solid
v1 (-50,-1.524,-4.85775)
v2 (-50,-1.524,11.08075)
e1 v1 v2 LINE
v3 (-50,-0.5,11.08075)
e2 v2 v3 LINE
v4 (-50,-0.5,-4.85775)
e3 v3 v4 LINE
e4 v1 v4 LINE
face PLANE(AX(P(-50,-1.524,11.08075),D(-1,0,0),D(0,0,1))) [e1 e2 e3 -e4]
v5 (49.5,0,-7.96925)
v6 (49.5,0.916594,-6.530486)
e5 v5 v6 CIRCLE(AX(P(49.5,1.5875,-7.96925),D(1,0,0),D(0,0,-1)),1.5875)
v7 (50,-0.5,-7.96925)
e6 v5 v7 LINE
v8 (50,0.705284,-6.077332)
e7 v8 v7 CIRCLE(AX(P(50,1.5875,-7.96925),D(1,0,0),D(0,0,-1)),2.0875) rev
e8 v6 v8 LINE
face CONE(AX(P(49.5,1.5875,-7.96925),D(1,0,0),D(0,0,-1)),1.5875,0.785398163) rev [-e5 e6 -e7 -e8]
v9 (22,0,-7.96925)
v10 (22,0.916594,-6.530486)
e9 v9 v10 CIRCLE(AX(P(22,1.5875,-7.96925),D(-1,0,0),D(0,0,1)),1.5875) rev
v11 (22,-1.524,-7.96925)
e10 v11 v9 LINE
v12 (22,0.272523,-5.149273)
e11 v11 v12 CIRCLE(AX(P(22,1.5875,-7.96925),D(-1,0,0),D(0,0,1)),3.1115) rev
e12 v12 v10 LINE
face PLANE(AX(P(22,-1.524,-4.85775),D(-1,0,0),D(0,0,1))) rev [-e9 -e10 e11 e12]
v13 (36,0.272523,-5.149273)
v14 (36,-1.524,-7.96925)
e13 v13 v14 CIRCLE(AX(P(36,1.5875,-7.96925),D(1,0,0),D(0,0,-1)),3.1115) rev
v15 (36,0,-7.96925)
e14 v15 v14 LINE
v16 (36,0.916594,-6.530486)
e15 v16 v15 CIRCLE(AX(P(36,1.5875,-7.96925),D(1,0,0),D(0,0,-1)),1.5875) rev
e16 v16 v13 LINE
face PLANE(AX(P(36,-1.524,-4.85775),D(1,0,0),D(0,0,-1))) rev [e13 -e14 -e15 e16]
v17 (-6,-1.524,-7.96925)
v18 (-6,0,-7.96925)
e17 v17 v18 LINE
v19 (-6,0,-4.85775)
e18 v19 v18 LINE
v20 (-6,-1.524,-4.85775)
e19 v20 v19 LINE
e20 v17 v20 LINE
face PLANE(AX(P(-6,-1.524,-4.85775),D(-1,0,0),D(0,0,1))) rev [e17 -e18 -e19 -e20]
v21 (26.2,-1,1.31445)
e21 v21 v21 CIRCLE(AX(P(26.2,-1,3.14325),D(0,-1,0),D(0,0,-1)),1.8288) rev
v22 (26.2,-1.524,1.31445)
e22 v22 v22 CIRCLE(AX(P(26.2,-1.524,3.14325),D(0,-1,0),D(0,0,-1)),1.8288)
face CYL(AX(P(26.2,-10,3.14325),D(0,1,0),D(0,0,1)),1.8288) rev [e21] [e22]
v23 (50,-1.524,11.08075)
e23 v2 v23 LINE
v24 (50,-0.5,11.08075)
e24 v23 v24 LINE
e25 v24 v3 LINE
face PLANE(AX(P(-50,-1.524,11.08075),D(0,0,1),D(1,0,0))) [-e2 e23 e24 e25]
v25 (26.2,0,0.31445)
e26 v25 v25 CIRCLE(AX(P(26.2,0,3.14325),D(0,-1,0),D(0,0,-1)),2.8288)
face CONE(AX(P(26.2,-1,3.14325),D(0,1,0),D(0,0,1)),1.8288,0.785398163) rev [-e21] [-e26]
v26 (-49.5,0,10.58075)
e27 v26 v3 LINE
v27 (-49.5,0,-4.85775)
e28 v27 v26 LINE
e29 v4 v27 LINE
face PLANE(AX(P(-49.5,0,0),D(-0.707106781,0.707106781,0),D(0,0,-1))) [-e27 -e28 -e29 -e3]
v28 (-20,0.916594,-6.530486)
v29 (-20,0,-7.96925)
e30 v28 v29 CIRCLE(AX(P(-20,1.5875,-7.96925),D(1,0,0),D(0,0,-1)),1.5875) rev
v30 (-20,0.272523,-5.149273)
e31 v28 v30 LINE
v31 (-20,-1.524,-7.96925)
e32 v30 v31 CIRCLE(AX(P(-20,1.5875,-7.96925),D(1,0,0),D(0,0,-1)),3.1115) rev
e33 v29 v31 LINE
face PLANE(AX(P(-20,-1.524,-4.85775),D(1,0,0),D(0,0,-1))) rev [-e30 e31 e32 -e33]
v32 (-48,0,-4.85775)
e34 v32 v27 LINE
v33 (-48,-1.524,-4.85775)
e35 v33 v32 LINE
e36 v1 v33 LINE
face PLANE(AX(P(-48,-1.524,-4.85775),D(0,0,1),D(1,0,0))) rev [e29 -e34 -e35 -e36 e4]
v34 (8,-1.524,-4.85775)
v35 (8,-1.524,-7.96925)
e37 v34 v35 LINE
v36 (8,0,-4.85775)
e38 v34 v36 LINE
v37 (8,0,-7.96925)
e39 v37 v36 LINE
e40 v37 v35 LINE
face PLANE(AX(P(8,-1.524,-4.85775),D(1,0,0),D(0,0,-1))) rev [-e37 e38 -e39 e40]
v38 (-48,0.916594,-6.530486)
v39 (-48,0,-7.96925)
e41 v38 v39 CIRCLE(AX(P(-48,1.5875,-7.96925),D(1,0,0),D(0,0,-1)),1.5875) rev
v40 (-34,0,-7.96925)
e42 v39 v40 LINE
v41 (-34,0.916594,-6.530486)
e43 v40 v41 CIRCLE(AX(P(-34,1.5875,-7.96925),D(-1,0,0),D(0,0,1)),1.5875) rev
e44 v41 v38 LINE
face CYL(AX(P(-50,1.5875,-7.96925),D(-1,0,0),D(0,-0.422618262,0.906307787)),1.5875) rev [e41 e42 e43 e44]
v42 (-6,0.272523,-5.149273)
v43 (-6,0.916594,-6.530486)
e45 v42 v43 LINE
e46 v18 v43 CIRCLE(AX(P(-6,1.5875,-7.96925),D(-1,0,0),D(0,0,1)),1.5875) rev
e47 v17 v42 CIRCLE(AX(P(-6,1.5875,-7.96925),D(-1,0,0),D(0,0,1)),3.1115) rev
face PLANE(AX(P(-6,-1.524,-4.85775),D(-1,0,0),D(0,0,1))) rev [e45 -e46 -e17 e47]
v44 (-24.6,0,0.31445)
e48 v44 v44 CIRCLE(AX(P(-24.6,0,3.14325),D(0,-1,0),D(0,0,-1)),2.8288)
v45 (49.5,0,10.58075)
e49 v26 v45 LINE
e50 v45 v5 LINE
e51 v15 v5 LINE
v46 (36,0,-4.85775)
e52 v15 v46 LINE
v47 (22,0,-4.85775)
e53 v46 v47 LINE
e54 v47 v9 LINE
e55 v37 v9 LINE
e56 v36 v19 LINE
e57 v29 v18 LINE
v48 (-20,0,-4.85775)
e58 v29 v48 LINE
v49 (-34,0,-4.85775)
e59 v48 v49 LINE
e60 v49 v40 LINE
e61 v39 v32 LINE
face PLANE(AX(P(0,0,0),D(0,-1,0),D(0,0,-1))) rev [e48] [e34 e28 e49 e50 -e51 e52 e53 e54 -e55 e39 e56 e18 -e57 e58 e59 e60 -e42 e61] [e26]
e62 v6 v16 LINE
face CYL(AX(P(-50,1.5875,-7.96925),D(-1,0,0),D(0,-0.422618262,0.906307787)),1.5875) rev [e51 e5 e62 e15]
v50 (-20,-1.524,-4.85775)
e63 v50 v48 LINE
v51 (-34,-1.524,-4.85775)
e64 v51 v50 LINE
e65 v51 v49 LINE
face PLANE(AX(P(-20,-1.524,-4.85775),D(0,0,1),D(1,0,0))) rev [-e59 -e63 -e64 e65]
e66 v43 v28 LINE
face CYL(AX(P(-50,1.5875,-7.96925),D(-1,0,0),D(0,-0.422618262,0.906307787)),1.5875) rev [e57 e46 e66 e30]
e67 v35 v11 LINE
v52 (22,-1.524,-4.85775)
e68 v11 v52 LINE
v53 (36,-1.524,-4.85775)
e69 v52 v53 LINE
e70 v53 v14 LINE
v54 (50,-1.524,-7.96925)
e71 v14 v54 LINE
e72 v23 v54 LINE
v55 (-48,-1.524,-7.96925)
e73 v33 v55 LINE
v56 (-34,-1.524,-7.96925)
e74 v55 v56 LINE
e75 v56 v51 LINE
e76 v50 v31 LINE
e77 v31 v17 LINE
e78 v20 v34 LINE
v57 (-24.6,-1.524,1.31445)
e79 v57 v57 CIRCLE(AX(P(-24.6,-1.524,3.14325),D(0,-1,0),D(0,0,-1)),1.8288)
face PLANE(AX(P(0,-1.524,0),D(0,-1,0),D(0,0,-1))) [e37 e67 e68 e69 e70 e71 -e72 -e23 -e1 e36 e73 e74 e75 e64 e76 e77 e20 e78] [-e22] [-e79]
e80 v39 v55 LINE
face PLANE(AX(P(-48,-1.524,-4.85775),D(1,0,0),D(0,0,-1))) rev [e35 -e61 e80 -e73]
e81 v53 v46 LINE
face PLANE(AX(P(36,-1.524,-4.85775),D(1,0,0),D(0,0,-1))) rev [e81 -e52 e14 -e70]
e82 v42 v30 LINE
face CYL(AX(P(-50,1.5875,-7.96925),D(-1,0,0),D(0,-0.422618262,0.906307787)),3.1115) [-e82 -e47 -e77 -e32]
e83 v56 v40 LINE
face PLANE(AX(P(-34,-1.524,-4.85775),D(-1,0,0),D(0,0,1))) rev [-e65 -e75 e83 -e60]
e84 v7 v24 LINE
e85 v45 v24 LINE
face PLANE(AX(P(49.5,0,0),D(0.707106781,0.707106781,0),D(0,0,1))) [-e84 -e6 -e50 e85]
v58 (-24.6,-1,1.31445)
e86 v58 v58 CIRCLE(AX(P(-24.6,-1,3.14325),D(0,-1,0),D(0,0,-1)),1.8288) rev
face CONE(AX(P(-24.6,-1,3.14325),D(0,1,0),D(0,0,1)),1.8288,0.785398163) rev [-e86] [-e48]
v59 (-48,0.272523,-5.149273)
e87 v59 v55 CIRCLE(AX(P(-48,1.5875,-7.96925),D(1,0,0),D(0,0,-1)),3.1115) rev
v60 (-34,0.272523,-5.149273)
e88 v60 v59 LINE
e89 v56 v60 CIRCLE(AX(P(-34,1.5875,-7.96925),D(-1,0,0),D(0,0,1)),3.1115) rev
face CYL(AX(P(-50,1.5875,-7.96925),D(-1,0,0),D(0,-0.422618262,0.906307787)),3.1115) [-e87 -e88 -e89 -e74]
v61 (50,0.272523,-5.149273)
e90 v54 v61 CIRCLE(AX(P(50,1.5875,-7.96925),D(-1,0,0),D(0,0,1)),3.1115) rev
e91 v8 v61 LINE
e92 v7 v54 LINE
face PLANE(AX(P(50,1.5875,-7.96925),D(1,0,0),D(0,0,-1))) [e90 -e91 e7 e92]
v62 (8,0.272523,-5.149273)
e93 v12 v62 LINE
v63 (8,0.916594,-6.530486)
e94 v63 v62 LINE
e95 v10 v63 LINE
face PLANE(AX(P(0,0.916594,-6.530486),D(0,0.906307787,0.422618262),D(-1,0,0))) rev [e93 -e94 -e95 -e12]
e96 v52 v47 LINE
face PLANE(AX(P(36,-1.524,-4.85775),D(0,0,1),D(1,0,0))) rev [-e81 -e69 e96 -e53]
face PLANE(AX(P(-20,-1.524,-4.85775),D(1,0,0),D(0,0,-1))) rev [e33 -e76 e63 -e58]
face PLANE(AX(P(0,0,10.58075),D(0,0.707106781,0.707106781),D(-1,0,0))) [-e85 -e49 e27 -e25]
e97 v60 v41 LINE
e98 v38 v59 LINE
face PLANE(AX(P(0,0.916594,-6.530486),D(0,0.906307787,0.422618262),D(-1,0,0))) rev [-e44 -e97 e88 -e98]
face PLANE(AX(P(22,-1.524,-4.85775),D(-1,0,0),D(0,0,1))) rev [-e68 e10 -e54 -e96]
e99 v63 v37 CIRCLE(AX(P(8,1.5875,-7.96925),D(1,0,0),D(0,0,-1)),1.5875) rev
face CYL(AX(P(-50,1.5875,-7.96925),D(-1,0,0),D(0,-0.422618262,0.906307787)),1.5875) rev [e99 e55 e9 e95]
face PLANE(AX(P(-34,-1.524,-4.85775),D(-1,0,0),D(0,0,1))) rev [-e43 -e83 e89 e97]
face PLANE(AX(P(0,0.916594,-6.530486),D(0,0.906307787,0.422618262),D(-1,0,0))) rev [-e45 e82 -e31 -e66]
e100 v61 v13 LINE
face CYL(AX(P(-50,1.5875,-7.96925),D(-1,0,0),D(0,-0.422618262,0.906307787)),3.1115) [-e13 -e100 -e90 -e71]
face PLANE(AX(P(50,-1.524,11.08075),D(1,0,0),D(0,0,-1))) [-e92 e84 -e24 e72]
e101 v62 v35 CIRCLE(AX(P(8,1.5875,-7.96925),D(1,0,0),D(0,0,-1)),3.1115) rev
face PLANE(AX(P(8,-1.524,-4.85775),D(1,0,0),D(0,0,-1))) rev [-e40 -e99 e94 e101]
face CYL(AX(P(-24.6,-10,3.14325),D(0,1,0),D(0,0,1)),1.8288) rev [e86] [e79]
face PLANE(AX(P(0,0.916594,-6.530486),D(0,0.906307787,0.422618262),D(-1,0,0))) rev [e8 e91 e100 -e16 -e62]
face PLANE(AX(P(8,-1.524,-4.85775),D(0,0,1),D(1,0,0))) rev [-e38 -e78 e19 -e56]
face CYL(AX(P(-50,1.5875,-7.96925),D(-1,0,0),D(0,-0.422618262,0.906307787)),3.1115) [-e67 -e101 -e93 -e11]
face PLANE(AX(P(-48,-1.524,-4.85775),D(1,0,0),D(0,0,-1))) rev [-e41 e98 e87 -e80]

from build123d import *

# Parameters (mm, degrees)
SKETCH1_W          = 100
SKETCH1_H          = 22.1615
BASE_FLANGE1_DEPTH = 1.524
HEM1_START         = -50
HEM1_DEPTH         = 100
HEM1_2_DEPTH       = 100
CUT_EXTRUDE1_START = -52.42823759
SKETCH8_W          = 14
SKETCH8_H          = 6.223
CUT_EXTRUDE1_DEPTH = 94.856475179
LPATTERN1_COUNT    = 11
LPATTERN1_PITCH    = 28
CHAMFER1_SIZE      = 0.5
SKETCH9_R          = 1.8288
CUT_EXTRUDE2_DEPTH = 10
LPATTERN2_COUNT    = 6
LPATTERN2_PITCH    = 50.8
CHAMFER2_SIZE      = 1


# Read off the part's stored shape, not the designer's step: Hem1
# Sheet-metal steps are written as plain solids
with BuildPart() as part:
    # Sketch1 → Base-Flange1 (new body)
    with BuildSketch(Plane(origin=(0, 0, 0), x_dir=(1, 0, 0), z_dir=(0, 1, 0))):
        Rectangle(SKETCH1_W, SKETCH1_H)
    extrude(amount=-BASE_FLANGE1_DEPTH)

    # Hem1 outline → Hem1 (cut)
    with BuildSketch(Plane.YZ.offset(HEM1_START)):
        with BuildLine():
            Line((0, -11.08075), (0, -10.645306054))
            ThreePointArc((0, -10.645306054), (-1.116287945, -9.509043168), (-1.524, -7.96925))
            Line((-1.524, -7.96925), (-1.524, -11.08075))
            Line((-1.524, -11.08075), (0, -11.08075))
        make_face()
    extrude(amount=HEM1_DEPTH, mode=Mode.SUBTRACT)

    # Hem1 2 outline → Hem1 2 (add)
    with BuildSketch(Plane.YZ.offset(HEM1_START)):
        with BuildLine():
            Line((0.272523279, -5.149273321), (0.916593509, -6.530486388))
            ThreePointArc((0.916593509, -6.530486388), (2.92638392, -8.822213128), (0, -7.96925))
            Line((0, -7.96925), (0, -10.645306054))
            ThreePointArc((0, -10.645306054), (4.69518189, -8.123345818), (0.272523279, -5.149273321))
        make_face()
    extrude(amount=HEM1_2_DEPTH)

    # Sketch8 → Cut-Extrude1 (cut)
    with BuildSketch(Plane(origin=(0, 0, 0), x_dir=(1, 0, 0), z_dir=(0, 1, 0)).offset(CUT_EXTRUDE1_START)):
        with Locations((29, 7.96925)):
            Rectangle(SKETCH8_W, SKETCH8_H)
    cut_extrude1 = extrude(amount=CUT_EXTRUDE1_DEPTH, mode=Mode.SUBTRACT)

    # LPattern1: Cut-Extrude1 ×11
    with Locations(*[(-i * LPATTERN1_PITCH, 0, 0) for i in range(1, LPATTERN1_COUNT)]):
        add(cut_extrude1, mode=Mode.SUBTRACT)

    # Chamfer1
    chamfer1_edges = [part.edges().sort_by_distance(p)[0] for p in [
        (-50, 0, 3.1115),
        (50, 2.92638392, -8.822213128),
        (0, 0, 11.08075),
        (50, 0, 1.55575),
    ]]
    chamfer(chamfer1_edges, length=CHAMFER1_SIZE)

    # Sketch9 → Cut-Extrude2 (cut)
    with BuildSketch(Plane(origin=(0, 0, 0), x_dir=(1, 0, 0), z_dir=(0, 1, 0))):
        with Locations(Location((-24.6, -3.14325, 0), (0, 0, 270))):
            Circle(SKETCH9_R)
    cut_extrude2 = extrude(amount=-CUT_EXTRUDE2_DEPTH, mode=Mode.SUBTRACT)

    # LPattern2: Cut-Extrude2 ×6
    with Locations(*[(i * LPATTERN2_PITCH, 0, 0) for i in range(1, LPATTERN2_COUNT)]):
        add(cut_extrude2, mode=Mode.SUBTRACT)

    # Chamfer2
    chamfer2_edges = [part.edges().sort_by_distance(p)[0] for p in [
        (-24.6, 0, 1.31445),
        (26.2, 0, 1.31445),
    ]]
    chamfer(chamfer2_edges, length=CHAMFER2_SIZE)


solid = part.part
